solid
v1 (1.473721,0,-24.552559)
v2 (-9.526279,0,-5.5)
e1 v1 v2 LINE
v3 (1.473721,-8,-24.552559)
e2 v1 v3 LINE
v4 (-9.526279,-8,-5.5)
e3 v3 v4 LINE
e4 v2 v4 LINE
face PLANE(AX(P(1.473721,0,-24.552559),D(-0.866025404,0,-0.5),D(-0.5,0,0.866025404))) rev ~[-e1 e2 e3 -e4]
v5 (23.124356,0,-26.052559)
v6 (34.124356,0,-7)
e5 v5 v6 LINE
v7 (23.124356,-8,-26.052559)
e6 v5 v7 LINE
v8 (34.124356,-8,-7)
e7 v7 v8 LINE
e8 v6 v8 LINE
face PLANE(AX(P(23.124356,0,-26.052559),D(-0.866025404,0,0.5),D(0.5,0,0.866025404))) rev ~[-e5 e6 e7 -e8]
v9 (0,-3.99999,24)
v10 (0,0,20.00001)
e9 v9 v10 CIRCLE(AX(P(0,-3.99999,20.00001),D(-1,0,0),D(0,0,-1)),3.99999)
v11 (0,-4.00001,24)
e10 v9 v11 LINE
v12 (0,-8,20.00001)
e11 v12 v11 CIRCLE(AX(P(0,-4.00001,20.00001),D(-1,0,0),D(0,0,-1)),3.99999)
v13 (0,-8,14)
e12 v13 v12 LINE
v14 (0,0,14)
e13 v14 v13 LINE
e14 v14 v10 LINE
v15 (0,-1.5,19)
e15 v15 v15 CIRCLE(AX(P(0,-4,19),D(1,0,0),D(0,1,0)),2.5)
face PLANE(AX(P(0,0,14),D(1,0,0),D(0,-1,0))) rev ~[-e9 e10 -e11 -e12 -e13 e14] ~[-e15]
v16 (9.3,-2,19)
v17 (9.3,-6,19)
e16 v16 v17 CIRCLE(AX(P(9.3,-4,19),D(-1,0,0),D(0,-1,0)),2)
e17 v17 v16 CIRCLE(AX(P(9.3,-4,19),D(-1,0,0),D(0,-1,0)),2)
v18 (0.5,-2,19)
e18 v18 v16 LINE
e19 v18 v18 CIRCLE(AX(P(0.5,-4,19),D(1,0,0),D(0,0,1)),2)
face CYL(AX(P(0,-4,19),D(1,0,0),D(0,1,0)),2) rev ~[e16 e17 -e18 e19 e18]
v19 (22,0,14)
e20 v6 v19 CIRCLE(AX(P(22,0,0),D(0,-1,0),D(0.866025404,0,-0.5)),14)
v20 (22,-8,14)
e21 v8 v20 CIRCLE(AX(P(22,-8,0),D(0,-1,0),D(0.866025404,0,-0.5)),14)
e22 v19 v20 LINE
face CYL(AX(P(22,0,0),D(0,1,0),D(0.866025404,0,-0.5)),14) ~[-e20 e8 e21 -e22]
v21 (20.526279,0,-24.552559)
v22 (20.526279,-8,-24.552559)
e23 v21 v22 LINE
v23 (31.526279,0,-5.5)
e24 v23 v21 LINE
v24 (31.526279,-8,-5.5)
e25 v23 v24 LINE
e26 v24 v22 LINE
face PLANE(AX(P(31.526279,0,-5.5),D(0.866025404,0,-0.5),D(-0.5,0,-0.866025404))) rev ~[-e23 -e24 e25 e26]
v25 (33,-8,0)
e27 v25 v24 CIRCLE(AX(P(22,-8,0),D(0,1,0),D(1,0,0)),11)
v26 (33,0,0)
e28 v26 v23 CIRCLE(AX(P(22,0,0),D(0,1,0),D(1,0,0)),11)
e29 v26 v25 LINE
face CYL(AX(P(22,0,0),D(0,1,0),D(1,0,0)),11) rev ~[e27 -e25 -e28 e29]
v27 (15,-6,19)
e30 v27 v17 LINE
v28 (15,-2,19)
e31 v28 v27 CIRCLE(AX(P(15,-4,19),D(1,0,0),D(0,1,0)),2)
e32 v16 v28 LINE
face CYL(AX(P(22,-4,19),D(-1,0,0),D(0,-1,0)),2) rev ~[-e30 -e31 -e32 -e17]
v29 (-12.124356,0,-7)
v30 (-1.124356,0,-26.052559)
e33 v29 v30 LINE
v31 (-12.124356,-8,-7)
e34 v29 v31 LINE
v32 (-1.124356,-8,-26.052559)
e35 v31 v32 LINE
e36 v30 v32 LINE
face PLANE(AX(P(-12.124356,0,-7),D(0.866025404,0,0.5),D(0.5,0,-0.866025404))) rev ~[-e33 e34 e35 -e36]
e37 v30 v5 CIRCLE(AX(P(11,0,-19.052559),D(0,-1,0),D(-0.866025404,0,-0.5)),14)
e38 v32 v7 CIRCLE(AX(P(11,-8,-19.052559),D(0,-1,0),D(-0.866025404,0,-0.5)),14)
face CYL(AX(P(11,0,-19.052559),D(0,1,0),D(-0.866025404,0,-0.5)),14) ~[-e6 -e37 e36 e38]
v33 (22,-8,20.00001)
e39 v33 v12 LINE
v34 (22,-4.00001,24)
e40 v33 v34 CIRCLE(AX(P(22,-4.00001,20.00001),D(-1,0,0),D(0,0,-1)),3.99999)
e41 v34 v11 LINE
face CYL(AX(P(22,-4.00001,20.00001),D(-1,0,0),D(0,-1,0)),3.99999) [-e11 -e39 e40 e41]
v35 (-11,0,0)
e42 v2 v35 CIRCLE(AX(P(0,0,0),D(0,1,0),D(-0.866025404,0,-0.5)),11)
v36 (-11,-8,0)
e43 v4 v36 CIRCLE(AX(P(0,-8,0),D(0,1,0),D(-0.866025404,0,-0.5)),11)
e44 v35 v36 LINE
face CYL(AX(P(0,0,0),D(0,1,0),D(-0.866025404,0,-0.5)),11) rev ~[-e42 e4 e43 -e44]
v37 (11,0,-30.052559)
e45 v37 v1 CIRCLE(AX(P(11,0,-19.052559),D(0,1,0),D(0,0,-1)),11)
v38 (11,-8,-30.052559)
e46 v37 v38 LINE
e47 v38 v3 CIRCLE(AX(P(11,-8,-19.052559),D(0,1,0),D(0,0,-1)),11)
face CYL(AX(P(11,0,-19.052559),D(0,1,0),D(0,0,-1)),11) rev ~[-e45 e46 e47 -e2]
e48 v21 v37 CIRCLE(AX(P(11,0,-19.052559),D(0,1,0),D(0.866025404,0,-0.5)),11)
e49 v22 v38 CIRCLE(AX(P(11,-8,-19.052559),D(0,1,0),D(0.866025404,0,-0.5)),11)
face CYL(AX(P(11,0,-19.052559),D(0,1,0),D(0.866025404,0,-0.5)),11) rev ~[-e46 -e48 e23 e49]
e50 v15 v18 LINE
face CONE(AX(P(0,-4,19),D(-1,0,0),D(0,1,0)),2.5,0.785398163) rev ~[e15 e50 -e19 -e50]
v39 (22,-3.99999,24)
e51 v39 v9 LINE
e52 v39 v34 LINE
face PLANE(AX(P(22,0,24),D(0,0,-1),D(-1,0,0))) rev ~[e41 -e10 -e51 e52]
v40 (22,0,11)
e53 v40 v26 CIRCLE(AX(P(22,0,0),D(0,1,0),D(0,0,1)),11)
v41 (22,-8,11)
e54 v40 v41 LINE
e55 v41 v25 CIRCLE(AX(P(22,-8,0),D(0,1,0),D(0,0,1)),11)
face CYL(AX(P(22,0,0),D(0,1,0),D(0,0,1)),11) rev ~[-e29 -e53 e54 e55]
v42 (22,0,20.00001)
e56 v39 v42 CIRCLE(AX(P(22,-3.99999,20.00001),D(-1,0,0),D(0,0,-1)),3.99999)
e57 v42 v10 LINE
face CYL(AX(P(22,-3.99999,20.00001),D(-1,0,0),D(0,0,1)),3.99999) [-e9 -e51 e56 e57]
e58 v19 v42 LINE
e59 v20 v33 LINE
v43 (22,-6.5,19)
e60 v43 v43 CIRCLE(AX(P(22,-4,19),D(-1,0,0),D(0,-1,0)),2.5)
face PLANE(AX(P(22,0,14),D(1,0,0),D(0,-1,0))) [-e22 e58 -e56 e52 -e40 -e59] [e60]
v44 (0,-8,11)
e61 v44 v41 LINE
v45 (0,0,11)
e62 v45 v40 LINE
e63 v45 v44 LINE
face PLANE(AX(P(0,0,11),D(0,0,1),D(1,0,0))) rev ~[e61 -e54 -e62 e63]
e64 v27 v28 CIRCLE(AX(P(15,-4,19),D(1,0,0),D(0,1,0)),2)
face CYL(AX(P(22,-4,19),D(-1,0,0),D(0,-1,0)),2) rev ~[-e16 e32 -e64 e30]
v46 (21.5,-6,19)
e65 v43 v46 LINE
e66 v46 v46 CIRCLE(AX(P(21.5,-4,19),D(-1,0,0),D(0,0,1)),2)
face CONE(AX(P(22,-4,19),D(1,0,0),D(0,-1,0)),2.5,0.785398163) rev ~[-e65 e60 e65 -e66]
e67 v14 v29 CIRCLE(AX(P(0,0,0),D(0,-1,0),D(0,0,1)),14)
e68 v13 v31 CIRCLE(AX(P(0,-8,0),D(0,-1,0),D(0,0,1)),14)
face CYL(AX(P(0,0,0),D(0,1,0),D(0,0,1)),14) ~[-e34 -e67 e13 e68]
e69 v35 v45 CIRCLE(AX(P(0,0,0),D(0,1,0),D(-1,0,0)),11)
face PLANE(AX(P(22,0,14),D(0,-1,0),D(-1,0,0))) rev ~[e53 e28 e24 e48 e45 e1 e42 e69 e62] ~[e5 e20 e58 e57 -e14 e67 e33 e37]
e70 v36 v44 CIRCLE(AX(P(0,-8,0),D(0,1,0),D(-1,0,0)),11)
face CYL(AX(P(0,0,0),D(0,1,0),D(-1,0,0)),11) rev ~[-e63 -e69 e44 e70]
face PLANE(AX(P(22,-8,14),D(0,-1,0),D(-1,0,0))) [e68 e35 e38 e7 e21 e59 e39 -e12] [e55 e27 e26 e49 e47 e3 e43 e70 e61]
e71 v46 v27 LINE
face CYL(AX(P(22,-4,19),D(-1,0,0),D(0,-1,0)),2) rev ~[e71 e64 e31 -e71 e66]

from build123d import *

# Parameters (mm, degrees)
F1_DEPTH       = 8
F2_DEPTH       = 10
F5_D           = 4
F5_DEPTH       = 12.7
F5_CSINK_D     = 5
F5_CSINK_ANGLE = 90
F5_TIP         = 1.2017212381
F6_D           = 4
F6_DEPTH       = 15
F6_CSINK_D     = 5
F6_CSINK_ANGLE = 90
F6_TIP         = 1.2017212381
F7_R           = 3.99999


# Not quite as in the source:
# - a fillet or chamfer is up to 0.001 mm smaller than in the source, because OpenCascade refuses the exact size


with BuildPart() as f1:
    # F0 (on Front) → F1 (new body)
    with BuildSketch(Plane.XZ):
        with BuildLine():
            ThreePointArc((0, 14), (-12.124355653, 7), (-12.124355653, -7))
            Line((-12.124355653, -7), (-1.124355653, -26.0525588833))
            ThreePointArc((-1.124355653, -26.0525588833), (11, -33.0525588833), (23.124355653, -26.0525588833))
            Line((23.124355653, -26.0525588833), (34.124355653, -7))
            ThreePointArc((34.124355653, -7), (34.124355653, 7), (22, 14))
            Line((22, 14), (0, 14))
        make_face()
        with BuildLine():
            ThreePointArc((-11, 0), (-7.7781745931, 7.7781745931), (0, 11))
            Line((0, 11), (11, 11))
            Line((11, 11), (22, 11))
            ThreePointArc((22, 11), (29.7781745931, 7.7781745931), (33, 0))
            ThreePointArc((33, 0), (32.6251840892, -2.8470094961), (31.5262794416, -5.5))
            Line((31.5262794416, -5.5), (20.5262794416, -24.5525588833))
            ThreePointArc((20.5262794416, -24.5525588833), (16.5, -28.5788383249), (11, -30.0525588833))
            ThreePointArc((11, -30.0525588833), (5.5, -28.5788383249), (1.4737205584, -24.5525588833))
            Line((1.4737205584, -24.5525588833), (-9.5262794416, -5.5))
            ThreePointArc((-9.5262794416, -5.5), (-10.6251840892, -2.8470094961), (-11, 0))
        make_face(mode=Mode.SUBTRACT)
    extrude(amount=F1_DEPTH)

    # F2 (add): a face of the model
    f2_faces = [f1.faces().sort_by_distance(p)[0] for p in [
        (11, -4, 14),
    ]]
    extrude(f2_faces, amount=F2_DEPTH)

    # F5
    with Locations(Plane.YZ.offset(22)):
        with Locations((-4, 19)):
            CounterSinkHole(F5_D / 2, F5_CSINK_D / 2, depth=F5_DEPTH, counter_sink_angle=F5_CSINK_ANGLE)
            with Locations((0, 0, -(F5_DEPTH + F5_TIP / 2))):  # 118° drill point
                Cone(0, F5_D / 2, F5_TIP, mode=Mode.SUBTRACT)

    # F6
    with Locations(Plane(origin=(0, 0, 0), x_dir=(0, -1, 0), z_dir=(-1, 0, 0))):
        with Locations((4, 19)):
            CounterSinkHole(F6_D / 2, F6_CSINK_D / 2, depth=F6_DEPTH, counter_sink_angle=F6_CSINK_ANGLE)
            with Locations((0, 0, -(F6_DEPTH + F6_TIP / 2))):  # 118° drill point
                Cone(0, F6_D / 2, F6_TIP, mode=Mode.SUBTRACT)

    # F7 (radius 4 in the source; OpenCascade refuses exactly that, so slightly less here)
    f7_edges = [f1.edges().sort_by_distance(p)[0] for p in [
        (11, 0, 24),
        (11, -8, 24),
    ]]
    fillet(f7_edges, radius=F7_R)


solid = f1.part
